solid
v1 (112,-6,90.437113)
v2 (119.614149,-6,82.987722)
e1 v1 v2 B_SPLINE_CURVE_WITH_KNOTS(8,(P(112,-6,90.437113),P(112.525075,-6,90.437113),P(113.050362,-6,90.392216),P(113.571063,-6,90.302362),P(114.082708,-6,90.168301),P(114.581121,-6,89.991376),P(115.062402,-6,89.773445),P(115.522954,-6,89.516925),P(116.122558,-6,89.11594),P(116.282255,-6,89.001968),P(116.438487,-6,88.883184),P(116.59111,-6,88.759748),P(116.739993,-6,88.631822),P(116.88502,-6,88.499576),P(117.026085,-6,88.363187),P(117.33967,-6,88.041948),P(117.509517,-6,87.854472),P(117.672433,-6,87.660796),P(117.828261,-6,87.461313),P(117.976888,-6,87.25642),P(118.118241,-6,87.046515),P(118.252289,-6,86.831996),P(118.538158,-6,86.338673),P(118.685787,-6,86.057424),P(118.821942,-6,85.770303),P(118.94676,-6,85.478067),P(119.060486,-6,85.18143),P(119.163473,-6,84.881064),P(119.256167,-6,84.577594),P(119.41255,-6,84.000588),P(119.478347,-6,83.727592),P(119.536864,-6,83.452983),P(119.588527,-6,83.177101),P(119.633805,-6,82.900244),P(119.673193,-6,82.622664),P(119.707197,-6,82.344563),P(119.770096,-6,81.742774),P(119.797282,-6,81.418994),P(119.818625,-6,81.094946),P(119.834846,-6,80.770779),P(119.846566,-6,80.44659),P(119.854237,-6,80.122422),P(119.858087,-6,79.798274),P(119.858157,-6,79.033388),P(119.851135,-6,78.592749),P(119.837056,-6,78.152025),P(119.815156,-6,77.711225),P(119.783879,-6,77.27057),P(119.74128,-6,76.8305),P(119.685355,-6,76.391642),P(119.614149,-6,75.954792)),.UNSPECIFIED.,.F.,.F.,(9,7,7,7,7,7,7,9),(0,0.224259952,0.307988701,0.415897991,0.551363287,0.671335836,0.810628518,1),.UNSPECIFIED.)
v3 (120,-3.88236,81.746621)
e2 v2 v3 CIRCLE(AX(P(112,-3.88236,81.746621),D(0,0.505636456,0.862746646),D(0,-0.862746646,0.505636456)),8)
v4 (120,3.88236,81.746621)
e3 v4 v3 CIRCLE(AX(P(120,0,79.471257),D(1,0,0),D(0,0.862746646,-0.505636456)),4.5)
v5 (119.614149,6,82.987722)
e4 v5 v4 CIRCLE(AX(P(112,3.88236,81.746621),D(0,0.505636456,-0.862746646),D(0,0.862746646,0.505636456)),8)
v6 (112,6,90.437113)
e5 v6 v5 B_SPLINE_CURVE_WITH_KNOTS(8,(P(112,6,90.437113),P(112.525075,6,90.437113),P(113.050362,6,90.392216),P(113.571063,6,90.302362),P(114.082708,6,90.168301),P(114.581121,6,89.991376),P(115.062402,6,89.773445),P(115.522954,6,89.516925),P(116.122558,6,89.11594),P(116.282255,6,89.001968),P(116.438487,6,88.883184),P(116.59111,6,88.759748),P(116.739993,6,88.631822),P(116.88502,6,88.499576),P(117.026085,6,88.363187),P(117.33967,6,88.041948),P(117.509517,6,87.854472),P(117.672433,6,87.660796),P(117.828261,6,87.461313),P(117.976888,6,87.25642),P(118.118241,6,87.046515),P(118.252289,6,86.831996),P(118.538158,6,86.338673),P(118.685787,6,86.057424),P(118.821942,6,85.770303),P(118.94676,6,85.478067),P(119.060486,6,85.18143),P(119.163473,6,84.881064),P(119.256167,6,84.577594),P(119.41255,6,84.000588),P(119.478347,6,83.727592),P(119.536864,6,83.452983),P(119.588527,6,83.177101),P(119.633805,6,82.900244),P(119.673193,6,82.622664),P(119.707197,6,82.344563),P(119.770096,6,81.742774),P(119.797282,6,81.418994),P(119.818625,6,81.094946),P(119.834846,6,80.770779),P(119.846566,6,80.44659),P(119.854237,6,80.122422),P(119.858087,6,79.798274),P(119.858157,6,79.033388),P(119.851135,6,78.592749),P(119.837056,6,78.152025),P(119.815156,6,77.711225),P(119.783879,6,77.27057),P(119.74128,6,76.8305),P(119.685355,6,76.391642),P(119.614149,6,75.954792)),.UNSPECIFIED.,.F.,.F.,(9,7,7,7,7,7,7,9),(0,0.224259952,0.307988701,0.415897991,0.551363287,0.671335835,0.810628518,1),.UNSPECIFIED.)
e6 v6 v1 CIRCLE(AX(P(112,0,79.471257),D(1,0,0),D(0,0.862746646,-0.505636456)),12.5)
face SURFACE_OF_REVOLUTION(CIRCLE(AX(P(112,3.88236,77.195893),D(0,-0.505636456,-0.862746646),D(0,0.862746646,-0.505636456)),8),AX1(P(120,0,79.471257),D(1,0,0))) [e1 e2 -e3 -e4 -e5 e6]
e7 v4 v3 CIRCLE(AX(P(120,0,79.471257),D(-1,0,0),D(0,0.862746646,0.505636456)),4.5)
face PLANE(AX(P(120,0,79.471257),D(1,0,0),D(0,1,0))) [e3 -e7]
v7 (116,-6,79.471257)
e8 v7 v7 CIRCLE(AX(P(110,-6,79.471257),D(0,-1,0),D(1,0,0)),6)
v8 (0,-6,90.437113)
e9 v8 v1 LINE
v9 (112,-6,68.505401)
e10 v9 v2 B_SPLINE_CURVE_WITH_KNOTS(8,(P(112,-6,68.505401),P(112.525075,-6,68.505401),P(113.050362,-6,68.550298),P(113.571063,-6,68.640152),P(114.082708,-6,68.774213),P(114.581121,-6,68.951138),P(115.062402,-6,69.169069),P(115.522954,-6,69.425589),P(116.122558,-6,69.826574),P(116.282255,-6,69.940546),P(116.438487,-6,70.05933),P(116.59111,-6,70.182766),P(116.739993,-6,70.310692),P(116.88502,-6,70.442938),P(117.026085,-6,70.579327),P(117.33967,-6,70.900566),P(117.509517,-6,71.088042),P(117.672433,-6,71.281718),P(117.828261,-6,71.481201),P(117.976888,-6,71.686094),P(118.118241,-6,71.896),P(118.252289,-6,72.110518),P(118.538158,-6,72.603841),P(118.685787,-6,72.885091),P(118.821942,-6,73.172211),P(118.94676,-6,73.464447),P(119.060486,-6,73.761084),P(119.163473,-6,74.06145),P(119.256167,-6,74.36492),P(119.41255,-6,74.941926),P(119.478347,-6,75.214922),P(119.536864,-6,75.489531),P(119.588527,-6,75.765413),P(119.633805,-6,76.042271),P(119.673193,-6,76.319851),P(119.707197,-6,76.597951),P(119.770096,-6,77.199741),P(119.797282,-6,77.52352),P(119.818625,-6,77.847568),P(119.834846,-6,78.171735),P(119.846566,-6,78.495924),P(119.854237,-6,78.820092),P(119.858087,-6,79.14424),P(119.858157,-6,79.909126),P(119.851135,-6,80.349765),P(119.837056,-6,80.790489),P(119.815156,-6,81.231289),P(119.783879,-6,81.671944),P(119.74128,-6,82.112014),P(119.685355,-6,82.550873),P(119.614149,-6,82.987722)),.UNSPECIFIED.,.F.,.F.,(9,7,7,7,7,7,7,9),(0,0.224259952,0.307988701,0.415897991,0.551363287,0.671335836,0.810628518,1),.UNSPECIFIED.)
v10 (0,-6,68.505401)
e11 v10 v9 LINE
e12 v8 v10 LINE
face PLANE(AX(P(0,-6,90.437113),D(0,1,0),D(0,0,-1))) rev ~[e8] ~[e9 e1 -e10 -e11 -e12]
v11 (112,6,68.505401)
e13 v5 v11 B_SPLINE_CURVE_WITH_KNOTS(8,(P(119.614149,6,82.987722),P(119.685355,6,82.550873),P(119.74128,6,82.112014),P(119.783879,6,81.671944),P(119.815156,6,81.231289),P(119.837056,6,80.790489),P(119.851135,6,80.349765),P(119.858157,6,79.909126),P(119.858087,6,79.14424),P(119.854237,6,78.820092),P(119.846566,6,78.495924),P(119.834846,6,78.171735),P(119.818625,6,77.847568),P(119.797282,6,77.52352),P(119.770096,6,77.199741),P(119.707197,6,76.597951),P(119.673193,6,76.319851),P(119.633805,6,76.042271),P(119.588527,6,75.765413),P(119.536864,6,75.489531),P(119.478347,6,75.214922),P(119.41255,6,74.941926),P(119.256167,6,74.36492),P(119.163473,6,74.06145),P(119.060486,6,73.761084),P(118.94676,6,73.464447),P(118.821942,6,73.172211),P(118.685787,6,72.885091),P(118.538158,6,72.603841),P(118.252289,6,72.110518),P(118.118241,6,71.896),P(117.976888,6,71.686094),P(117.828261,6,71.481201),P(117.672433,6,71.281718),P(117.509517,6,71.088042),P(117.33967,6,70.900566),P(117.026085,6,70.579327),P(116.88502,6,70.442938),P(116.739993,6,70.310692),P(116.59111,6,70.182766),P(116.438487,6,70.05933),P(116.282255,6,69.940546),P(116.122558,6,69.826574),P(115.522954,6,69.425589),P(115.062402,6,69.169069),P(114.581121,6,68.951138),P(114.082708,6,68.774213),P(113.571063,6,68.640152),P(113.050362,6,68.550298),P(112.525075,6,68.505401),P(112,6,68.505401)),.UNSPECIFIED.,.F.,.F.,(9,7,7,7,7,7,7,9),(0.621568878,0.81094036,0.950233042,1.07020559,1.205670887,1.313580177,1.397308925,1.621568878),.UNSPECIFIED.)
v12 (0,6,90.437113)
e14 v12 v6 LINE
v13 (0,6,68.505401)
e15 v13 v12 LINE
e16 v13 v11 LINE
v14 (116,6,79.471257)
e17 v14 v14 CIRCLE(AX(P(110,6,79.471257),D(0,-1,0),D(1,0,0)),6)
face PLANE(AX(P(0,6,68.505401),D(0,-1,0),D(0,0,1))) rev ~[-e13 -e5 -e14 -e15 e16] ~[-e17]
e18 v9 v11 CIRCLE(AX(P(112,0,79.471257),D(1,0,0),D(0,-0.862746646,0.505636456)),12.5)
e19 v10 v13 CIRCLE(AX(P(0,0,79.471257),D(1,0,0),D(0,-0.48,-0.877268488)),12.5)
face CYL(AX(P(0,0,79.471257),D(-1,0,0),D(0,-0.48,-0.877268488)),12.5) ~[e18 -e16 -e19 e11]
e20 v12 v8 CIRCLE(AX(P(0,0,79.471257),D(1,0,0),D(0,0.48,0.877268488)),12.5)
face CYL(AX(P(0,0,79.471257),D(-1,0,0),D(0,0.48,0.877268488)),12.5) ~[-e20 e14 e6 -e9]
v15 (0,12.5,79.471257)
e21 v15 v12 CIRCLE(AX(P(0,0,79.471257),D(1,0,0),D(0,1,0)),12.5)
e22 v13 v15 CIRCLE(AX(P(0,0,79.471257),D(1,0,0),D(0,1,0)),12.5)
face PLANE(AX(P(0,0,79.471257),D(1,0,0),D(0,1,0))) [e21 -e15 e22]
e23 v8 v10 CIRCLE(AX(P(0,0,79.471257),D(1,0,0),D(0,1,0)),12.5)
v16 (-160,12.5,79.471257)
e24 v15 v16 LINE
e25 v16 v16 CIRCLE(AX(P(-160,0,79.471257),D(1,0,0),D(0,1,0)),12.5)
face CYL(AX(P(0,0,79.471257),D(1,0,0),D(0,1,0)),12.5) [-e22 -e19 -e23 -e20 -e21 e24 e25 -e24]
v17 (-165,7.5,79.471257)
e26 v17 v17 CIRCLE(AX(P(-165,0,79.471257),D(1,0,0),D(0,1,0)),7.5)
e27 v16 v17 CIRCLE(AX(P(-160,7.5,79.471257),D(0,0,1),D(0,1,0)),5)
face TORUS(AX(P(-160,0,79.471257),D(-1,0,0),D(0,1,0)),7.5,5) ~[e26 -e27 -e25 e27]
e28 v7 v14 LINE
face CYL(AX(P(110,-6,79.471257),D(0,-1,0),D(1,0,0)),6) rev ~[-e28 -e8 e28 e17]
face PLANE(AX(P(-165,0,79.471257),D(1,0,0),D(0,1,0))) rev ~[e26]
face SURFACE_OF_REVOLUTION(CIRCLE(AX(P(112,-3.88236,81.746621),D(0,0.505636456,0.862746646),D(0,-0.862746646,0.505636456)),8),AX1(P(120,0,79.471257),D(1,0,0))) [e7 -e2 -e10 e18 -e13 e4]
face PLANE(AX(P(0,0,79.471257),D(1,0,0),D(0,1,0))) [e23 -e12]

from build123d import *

# Parameters (mm, degrees)
F0_R        = 12.5
F1_DEPTH    = 165
F2_R        = 5
F5_DEPTH    = 120
F6_R        = 6
F7_DEPTH    = 18.501
F8_T2_ANGLE = 240.7472216417
F8_T4_ANGLE = 240.7472216417


# Not quite as in the source:
# - a fillet or chamfer that OpenCascade refuses, or shapes differently, is made with other operations: its cross-section is extruded or revolved along the edge and cut away or added


with BuildPart() as f1:
    # F0 (on Right) → F1 (new body)
    with BuildSketch(Plane.YZ):
        with Locations((0, 79.4712570496)):
            Circle(F0_R)
    extrude(amount=-F1_DEPTH)

    # F2
    f2_edges = [f1.edges().sort_by_distance(p)[0] for p in [
        (-165, -12.5, 79.471257),
    ]]
    fillet(f2_edges, radius=F2_R)

    # F4 (on face) → F5 (join)
    with BuildSketch(Plane.YZ):
        with BuildLine():
            ThreePointArc((6, 90.4371131493), (0, 91.9712570496), (-6, 90.4371131493))
            Line((-6, 90.4371131493), (-6, 68.5054009499))
            ThreePointArc((-6, 68.5054009499), (0, 66.9712570496), (6, 68.5054009499))
            Line((6, 68.5054009499), (6, 90.4371131493))
        make_face()
    extrude(amount=F5_DEPTH)

    # F6 (on face) → F7 (cut, through all)
    with BuildSketch(Plane.XZ.offset(6)):
        with Locations((110, 79.4712570496)):
            Circle(F6_R)
    extrude(amount=-F7_DEPTH, mode=Mode.SUBTRACT)

    # F8: fillet of radius 8 on 2 edges, made by hand

    # F8_s1 → F8_t2 (revolve, cut)
    with BuildSketch(Plane(origin=(0, 34.6682356906, 59.1529818038), x_dir=(1, 0, 0), z_dir=(0, 0.5056364556, 0.8627466458))):
        with BuildLine():
            ThreePointArc((112, -52.6835647356), (117.6568542495, -50.3404189851), (120, -44.6835647356))
            Line((120, -44.6835647356), (120, -52.6835647356))
            Line((120, -52.6835647356), (112, -52.6835647356))
        make_face()
    revolve(axis=Axis((120, 0, 79.4712570496), (1, 0, 0)), revolution_arc=F8_T2_ANGLE, mode=Mode.SUBTRACT)

    # F8_s3 → F8_t4 (revolve, cut)
    with BuildSketch(Plane(origin=(0, 34.6682356906, 59.1529818038), x_dir=(1, 0, 0), z_dir=(0, -0.5056364556, -0.8627466458))):
        with BuildLine():
            ThreePointArc((112, 27.6835647356), (117.6568542495, 30.0267104861), (120, 35.6835647356))
            Line((120, 35.6835647356), (120, 27.6835647356))
            Line((120, 27.6835647356), (112, 27.6835647356))
        make_face()
    revolve(axis=Axis((120, 0, 79.4712570496), (1, 0, 0)), revolution_arc=F8_T4_ANGLE, mode=Mode.SUBTRACT)


solid = f1.part
